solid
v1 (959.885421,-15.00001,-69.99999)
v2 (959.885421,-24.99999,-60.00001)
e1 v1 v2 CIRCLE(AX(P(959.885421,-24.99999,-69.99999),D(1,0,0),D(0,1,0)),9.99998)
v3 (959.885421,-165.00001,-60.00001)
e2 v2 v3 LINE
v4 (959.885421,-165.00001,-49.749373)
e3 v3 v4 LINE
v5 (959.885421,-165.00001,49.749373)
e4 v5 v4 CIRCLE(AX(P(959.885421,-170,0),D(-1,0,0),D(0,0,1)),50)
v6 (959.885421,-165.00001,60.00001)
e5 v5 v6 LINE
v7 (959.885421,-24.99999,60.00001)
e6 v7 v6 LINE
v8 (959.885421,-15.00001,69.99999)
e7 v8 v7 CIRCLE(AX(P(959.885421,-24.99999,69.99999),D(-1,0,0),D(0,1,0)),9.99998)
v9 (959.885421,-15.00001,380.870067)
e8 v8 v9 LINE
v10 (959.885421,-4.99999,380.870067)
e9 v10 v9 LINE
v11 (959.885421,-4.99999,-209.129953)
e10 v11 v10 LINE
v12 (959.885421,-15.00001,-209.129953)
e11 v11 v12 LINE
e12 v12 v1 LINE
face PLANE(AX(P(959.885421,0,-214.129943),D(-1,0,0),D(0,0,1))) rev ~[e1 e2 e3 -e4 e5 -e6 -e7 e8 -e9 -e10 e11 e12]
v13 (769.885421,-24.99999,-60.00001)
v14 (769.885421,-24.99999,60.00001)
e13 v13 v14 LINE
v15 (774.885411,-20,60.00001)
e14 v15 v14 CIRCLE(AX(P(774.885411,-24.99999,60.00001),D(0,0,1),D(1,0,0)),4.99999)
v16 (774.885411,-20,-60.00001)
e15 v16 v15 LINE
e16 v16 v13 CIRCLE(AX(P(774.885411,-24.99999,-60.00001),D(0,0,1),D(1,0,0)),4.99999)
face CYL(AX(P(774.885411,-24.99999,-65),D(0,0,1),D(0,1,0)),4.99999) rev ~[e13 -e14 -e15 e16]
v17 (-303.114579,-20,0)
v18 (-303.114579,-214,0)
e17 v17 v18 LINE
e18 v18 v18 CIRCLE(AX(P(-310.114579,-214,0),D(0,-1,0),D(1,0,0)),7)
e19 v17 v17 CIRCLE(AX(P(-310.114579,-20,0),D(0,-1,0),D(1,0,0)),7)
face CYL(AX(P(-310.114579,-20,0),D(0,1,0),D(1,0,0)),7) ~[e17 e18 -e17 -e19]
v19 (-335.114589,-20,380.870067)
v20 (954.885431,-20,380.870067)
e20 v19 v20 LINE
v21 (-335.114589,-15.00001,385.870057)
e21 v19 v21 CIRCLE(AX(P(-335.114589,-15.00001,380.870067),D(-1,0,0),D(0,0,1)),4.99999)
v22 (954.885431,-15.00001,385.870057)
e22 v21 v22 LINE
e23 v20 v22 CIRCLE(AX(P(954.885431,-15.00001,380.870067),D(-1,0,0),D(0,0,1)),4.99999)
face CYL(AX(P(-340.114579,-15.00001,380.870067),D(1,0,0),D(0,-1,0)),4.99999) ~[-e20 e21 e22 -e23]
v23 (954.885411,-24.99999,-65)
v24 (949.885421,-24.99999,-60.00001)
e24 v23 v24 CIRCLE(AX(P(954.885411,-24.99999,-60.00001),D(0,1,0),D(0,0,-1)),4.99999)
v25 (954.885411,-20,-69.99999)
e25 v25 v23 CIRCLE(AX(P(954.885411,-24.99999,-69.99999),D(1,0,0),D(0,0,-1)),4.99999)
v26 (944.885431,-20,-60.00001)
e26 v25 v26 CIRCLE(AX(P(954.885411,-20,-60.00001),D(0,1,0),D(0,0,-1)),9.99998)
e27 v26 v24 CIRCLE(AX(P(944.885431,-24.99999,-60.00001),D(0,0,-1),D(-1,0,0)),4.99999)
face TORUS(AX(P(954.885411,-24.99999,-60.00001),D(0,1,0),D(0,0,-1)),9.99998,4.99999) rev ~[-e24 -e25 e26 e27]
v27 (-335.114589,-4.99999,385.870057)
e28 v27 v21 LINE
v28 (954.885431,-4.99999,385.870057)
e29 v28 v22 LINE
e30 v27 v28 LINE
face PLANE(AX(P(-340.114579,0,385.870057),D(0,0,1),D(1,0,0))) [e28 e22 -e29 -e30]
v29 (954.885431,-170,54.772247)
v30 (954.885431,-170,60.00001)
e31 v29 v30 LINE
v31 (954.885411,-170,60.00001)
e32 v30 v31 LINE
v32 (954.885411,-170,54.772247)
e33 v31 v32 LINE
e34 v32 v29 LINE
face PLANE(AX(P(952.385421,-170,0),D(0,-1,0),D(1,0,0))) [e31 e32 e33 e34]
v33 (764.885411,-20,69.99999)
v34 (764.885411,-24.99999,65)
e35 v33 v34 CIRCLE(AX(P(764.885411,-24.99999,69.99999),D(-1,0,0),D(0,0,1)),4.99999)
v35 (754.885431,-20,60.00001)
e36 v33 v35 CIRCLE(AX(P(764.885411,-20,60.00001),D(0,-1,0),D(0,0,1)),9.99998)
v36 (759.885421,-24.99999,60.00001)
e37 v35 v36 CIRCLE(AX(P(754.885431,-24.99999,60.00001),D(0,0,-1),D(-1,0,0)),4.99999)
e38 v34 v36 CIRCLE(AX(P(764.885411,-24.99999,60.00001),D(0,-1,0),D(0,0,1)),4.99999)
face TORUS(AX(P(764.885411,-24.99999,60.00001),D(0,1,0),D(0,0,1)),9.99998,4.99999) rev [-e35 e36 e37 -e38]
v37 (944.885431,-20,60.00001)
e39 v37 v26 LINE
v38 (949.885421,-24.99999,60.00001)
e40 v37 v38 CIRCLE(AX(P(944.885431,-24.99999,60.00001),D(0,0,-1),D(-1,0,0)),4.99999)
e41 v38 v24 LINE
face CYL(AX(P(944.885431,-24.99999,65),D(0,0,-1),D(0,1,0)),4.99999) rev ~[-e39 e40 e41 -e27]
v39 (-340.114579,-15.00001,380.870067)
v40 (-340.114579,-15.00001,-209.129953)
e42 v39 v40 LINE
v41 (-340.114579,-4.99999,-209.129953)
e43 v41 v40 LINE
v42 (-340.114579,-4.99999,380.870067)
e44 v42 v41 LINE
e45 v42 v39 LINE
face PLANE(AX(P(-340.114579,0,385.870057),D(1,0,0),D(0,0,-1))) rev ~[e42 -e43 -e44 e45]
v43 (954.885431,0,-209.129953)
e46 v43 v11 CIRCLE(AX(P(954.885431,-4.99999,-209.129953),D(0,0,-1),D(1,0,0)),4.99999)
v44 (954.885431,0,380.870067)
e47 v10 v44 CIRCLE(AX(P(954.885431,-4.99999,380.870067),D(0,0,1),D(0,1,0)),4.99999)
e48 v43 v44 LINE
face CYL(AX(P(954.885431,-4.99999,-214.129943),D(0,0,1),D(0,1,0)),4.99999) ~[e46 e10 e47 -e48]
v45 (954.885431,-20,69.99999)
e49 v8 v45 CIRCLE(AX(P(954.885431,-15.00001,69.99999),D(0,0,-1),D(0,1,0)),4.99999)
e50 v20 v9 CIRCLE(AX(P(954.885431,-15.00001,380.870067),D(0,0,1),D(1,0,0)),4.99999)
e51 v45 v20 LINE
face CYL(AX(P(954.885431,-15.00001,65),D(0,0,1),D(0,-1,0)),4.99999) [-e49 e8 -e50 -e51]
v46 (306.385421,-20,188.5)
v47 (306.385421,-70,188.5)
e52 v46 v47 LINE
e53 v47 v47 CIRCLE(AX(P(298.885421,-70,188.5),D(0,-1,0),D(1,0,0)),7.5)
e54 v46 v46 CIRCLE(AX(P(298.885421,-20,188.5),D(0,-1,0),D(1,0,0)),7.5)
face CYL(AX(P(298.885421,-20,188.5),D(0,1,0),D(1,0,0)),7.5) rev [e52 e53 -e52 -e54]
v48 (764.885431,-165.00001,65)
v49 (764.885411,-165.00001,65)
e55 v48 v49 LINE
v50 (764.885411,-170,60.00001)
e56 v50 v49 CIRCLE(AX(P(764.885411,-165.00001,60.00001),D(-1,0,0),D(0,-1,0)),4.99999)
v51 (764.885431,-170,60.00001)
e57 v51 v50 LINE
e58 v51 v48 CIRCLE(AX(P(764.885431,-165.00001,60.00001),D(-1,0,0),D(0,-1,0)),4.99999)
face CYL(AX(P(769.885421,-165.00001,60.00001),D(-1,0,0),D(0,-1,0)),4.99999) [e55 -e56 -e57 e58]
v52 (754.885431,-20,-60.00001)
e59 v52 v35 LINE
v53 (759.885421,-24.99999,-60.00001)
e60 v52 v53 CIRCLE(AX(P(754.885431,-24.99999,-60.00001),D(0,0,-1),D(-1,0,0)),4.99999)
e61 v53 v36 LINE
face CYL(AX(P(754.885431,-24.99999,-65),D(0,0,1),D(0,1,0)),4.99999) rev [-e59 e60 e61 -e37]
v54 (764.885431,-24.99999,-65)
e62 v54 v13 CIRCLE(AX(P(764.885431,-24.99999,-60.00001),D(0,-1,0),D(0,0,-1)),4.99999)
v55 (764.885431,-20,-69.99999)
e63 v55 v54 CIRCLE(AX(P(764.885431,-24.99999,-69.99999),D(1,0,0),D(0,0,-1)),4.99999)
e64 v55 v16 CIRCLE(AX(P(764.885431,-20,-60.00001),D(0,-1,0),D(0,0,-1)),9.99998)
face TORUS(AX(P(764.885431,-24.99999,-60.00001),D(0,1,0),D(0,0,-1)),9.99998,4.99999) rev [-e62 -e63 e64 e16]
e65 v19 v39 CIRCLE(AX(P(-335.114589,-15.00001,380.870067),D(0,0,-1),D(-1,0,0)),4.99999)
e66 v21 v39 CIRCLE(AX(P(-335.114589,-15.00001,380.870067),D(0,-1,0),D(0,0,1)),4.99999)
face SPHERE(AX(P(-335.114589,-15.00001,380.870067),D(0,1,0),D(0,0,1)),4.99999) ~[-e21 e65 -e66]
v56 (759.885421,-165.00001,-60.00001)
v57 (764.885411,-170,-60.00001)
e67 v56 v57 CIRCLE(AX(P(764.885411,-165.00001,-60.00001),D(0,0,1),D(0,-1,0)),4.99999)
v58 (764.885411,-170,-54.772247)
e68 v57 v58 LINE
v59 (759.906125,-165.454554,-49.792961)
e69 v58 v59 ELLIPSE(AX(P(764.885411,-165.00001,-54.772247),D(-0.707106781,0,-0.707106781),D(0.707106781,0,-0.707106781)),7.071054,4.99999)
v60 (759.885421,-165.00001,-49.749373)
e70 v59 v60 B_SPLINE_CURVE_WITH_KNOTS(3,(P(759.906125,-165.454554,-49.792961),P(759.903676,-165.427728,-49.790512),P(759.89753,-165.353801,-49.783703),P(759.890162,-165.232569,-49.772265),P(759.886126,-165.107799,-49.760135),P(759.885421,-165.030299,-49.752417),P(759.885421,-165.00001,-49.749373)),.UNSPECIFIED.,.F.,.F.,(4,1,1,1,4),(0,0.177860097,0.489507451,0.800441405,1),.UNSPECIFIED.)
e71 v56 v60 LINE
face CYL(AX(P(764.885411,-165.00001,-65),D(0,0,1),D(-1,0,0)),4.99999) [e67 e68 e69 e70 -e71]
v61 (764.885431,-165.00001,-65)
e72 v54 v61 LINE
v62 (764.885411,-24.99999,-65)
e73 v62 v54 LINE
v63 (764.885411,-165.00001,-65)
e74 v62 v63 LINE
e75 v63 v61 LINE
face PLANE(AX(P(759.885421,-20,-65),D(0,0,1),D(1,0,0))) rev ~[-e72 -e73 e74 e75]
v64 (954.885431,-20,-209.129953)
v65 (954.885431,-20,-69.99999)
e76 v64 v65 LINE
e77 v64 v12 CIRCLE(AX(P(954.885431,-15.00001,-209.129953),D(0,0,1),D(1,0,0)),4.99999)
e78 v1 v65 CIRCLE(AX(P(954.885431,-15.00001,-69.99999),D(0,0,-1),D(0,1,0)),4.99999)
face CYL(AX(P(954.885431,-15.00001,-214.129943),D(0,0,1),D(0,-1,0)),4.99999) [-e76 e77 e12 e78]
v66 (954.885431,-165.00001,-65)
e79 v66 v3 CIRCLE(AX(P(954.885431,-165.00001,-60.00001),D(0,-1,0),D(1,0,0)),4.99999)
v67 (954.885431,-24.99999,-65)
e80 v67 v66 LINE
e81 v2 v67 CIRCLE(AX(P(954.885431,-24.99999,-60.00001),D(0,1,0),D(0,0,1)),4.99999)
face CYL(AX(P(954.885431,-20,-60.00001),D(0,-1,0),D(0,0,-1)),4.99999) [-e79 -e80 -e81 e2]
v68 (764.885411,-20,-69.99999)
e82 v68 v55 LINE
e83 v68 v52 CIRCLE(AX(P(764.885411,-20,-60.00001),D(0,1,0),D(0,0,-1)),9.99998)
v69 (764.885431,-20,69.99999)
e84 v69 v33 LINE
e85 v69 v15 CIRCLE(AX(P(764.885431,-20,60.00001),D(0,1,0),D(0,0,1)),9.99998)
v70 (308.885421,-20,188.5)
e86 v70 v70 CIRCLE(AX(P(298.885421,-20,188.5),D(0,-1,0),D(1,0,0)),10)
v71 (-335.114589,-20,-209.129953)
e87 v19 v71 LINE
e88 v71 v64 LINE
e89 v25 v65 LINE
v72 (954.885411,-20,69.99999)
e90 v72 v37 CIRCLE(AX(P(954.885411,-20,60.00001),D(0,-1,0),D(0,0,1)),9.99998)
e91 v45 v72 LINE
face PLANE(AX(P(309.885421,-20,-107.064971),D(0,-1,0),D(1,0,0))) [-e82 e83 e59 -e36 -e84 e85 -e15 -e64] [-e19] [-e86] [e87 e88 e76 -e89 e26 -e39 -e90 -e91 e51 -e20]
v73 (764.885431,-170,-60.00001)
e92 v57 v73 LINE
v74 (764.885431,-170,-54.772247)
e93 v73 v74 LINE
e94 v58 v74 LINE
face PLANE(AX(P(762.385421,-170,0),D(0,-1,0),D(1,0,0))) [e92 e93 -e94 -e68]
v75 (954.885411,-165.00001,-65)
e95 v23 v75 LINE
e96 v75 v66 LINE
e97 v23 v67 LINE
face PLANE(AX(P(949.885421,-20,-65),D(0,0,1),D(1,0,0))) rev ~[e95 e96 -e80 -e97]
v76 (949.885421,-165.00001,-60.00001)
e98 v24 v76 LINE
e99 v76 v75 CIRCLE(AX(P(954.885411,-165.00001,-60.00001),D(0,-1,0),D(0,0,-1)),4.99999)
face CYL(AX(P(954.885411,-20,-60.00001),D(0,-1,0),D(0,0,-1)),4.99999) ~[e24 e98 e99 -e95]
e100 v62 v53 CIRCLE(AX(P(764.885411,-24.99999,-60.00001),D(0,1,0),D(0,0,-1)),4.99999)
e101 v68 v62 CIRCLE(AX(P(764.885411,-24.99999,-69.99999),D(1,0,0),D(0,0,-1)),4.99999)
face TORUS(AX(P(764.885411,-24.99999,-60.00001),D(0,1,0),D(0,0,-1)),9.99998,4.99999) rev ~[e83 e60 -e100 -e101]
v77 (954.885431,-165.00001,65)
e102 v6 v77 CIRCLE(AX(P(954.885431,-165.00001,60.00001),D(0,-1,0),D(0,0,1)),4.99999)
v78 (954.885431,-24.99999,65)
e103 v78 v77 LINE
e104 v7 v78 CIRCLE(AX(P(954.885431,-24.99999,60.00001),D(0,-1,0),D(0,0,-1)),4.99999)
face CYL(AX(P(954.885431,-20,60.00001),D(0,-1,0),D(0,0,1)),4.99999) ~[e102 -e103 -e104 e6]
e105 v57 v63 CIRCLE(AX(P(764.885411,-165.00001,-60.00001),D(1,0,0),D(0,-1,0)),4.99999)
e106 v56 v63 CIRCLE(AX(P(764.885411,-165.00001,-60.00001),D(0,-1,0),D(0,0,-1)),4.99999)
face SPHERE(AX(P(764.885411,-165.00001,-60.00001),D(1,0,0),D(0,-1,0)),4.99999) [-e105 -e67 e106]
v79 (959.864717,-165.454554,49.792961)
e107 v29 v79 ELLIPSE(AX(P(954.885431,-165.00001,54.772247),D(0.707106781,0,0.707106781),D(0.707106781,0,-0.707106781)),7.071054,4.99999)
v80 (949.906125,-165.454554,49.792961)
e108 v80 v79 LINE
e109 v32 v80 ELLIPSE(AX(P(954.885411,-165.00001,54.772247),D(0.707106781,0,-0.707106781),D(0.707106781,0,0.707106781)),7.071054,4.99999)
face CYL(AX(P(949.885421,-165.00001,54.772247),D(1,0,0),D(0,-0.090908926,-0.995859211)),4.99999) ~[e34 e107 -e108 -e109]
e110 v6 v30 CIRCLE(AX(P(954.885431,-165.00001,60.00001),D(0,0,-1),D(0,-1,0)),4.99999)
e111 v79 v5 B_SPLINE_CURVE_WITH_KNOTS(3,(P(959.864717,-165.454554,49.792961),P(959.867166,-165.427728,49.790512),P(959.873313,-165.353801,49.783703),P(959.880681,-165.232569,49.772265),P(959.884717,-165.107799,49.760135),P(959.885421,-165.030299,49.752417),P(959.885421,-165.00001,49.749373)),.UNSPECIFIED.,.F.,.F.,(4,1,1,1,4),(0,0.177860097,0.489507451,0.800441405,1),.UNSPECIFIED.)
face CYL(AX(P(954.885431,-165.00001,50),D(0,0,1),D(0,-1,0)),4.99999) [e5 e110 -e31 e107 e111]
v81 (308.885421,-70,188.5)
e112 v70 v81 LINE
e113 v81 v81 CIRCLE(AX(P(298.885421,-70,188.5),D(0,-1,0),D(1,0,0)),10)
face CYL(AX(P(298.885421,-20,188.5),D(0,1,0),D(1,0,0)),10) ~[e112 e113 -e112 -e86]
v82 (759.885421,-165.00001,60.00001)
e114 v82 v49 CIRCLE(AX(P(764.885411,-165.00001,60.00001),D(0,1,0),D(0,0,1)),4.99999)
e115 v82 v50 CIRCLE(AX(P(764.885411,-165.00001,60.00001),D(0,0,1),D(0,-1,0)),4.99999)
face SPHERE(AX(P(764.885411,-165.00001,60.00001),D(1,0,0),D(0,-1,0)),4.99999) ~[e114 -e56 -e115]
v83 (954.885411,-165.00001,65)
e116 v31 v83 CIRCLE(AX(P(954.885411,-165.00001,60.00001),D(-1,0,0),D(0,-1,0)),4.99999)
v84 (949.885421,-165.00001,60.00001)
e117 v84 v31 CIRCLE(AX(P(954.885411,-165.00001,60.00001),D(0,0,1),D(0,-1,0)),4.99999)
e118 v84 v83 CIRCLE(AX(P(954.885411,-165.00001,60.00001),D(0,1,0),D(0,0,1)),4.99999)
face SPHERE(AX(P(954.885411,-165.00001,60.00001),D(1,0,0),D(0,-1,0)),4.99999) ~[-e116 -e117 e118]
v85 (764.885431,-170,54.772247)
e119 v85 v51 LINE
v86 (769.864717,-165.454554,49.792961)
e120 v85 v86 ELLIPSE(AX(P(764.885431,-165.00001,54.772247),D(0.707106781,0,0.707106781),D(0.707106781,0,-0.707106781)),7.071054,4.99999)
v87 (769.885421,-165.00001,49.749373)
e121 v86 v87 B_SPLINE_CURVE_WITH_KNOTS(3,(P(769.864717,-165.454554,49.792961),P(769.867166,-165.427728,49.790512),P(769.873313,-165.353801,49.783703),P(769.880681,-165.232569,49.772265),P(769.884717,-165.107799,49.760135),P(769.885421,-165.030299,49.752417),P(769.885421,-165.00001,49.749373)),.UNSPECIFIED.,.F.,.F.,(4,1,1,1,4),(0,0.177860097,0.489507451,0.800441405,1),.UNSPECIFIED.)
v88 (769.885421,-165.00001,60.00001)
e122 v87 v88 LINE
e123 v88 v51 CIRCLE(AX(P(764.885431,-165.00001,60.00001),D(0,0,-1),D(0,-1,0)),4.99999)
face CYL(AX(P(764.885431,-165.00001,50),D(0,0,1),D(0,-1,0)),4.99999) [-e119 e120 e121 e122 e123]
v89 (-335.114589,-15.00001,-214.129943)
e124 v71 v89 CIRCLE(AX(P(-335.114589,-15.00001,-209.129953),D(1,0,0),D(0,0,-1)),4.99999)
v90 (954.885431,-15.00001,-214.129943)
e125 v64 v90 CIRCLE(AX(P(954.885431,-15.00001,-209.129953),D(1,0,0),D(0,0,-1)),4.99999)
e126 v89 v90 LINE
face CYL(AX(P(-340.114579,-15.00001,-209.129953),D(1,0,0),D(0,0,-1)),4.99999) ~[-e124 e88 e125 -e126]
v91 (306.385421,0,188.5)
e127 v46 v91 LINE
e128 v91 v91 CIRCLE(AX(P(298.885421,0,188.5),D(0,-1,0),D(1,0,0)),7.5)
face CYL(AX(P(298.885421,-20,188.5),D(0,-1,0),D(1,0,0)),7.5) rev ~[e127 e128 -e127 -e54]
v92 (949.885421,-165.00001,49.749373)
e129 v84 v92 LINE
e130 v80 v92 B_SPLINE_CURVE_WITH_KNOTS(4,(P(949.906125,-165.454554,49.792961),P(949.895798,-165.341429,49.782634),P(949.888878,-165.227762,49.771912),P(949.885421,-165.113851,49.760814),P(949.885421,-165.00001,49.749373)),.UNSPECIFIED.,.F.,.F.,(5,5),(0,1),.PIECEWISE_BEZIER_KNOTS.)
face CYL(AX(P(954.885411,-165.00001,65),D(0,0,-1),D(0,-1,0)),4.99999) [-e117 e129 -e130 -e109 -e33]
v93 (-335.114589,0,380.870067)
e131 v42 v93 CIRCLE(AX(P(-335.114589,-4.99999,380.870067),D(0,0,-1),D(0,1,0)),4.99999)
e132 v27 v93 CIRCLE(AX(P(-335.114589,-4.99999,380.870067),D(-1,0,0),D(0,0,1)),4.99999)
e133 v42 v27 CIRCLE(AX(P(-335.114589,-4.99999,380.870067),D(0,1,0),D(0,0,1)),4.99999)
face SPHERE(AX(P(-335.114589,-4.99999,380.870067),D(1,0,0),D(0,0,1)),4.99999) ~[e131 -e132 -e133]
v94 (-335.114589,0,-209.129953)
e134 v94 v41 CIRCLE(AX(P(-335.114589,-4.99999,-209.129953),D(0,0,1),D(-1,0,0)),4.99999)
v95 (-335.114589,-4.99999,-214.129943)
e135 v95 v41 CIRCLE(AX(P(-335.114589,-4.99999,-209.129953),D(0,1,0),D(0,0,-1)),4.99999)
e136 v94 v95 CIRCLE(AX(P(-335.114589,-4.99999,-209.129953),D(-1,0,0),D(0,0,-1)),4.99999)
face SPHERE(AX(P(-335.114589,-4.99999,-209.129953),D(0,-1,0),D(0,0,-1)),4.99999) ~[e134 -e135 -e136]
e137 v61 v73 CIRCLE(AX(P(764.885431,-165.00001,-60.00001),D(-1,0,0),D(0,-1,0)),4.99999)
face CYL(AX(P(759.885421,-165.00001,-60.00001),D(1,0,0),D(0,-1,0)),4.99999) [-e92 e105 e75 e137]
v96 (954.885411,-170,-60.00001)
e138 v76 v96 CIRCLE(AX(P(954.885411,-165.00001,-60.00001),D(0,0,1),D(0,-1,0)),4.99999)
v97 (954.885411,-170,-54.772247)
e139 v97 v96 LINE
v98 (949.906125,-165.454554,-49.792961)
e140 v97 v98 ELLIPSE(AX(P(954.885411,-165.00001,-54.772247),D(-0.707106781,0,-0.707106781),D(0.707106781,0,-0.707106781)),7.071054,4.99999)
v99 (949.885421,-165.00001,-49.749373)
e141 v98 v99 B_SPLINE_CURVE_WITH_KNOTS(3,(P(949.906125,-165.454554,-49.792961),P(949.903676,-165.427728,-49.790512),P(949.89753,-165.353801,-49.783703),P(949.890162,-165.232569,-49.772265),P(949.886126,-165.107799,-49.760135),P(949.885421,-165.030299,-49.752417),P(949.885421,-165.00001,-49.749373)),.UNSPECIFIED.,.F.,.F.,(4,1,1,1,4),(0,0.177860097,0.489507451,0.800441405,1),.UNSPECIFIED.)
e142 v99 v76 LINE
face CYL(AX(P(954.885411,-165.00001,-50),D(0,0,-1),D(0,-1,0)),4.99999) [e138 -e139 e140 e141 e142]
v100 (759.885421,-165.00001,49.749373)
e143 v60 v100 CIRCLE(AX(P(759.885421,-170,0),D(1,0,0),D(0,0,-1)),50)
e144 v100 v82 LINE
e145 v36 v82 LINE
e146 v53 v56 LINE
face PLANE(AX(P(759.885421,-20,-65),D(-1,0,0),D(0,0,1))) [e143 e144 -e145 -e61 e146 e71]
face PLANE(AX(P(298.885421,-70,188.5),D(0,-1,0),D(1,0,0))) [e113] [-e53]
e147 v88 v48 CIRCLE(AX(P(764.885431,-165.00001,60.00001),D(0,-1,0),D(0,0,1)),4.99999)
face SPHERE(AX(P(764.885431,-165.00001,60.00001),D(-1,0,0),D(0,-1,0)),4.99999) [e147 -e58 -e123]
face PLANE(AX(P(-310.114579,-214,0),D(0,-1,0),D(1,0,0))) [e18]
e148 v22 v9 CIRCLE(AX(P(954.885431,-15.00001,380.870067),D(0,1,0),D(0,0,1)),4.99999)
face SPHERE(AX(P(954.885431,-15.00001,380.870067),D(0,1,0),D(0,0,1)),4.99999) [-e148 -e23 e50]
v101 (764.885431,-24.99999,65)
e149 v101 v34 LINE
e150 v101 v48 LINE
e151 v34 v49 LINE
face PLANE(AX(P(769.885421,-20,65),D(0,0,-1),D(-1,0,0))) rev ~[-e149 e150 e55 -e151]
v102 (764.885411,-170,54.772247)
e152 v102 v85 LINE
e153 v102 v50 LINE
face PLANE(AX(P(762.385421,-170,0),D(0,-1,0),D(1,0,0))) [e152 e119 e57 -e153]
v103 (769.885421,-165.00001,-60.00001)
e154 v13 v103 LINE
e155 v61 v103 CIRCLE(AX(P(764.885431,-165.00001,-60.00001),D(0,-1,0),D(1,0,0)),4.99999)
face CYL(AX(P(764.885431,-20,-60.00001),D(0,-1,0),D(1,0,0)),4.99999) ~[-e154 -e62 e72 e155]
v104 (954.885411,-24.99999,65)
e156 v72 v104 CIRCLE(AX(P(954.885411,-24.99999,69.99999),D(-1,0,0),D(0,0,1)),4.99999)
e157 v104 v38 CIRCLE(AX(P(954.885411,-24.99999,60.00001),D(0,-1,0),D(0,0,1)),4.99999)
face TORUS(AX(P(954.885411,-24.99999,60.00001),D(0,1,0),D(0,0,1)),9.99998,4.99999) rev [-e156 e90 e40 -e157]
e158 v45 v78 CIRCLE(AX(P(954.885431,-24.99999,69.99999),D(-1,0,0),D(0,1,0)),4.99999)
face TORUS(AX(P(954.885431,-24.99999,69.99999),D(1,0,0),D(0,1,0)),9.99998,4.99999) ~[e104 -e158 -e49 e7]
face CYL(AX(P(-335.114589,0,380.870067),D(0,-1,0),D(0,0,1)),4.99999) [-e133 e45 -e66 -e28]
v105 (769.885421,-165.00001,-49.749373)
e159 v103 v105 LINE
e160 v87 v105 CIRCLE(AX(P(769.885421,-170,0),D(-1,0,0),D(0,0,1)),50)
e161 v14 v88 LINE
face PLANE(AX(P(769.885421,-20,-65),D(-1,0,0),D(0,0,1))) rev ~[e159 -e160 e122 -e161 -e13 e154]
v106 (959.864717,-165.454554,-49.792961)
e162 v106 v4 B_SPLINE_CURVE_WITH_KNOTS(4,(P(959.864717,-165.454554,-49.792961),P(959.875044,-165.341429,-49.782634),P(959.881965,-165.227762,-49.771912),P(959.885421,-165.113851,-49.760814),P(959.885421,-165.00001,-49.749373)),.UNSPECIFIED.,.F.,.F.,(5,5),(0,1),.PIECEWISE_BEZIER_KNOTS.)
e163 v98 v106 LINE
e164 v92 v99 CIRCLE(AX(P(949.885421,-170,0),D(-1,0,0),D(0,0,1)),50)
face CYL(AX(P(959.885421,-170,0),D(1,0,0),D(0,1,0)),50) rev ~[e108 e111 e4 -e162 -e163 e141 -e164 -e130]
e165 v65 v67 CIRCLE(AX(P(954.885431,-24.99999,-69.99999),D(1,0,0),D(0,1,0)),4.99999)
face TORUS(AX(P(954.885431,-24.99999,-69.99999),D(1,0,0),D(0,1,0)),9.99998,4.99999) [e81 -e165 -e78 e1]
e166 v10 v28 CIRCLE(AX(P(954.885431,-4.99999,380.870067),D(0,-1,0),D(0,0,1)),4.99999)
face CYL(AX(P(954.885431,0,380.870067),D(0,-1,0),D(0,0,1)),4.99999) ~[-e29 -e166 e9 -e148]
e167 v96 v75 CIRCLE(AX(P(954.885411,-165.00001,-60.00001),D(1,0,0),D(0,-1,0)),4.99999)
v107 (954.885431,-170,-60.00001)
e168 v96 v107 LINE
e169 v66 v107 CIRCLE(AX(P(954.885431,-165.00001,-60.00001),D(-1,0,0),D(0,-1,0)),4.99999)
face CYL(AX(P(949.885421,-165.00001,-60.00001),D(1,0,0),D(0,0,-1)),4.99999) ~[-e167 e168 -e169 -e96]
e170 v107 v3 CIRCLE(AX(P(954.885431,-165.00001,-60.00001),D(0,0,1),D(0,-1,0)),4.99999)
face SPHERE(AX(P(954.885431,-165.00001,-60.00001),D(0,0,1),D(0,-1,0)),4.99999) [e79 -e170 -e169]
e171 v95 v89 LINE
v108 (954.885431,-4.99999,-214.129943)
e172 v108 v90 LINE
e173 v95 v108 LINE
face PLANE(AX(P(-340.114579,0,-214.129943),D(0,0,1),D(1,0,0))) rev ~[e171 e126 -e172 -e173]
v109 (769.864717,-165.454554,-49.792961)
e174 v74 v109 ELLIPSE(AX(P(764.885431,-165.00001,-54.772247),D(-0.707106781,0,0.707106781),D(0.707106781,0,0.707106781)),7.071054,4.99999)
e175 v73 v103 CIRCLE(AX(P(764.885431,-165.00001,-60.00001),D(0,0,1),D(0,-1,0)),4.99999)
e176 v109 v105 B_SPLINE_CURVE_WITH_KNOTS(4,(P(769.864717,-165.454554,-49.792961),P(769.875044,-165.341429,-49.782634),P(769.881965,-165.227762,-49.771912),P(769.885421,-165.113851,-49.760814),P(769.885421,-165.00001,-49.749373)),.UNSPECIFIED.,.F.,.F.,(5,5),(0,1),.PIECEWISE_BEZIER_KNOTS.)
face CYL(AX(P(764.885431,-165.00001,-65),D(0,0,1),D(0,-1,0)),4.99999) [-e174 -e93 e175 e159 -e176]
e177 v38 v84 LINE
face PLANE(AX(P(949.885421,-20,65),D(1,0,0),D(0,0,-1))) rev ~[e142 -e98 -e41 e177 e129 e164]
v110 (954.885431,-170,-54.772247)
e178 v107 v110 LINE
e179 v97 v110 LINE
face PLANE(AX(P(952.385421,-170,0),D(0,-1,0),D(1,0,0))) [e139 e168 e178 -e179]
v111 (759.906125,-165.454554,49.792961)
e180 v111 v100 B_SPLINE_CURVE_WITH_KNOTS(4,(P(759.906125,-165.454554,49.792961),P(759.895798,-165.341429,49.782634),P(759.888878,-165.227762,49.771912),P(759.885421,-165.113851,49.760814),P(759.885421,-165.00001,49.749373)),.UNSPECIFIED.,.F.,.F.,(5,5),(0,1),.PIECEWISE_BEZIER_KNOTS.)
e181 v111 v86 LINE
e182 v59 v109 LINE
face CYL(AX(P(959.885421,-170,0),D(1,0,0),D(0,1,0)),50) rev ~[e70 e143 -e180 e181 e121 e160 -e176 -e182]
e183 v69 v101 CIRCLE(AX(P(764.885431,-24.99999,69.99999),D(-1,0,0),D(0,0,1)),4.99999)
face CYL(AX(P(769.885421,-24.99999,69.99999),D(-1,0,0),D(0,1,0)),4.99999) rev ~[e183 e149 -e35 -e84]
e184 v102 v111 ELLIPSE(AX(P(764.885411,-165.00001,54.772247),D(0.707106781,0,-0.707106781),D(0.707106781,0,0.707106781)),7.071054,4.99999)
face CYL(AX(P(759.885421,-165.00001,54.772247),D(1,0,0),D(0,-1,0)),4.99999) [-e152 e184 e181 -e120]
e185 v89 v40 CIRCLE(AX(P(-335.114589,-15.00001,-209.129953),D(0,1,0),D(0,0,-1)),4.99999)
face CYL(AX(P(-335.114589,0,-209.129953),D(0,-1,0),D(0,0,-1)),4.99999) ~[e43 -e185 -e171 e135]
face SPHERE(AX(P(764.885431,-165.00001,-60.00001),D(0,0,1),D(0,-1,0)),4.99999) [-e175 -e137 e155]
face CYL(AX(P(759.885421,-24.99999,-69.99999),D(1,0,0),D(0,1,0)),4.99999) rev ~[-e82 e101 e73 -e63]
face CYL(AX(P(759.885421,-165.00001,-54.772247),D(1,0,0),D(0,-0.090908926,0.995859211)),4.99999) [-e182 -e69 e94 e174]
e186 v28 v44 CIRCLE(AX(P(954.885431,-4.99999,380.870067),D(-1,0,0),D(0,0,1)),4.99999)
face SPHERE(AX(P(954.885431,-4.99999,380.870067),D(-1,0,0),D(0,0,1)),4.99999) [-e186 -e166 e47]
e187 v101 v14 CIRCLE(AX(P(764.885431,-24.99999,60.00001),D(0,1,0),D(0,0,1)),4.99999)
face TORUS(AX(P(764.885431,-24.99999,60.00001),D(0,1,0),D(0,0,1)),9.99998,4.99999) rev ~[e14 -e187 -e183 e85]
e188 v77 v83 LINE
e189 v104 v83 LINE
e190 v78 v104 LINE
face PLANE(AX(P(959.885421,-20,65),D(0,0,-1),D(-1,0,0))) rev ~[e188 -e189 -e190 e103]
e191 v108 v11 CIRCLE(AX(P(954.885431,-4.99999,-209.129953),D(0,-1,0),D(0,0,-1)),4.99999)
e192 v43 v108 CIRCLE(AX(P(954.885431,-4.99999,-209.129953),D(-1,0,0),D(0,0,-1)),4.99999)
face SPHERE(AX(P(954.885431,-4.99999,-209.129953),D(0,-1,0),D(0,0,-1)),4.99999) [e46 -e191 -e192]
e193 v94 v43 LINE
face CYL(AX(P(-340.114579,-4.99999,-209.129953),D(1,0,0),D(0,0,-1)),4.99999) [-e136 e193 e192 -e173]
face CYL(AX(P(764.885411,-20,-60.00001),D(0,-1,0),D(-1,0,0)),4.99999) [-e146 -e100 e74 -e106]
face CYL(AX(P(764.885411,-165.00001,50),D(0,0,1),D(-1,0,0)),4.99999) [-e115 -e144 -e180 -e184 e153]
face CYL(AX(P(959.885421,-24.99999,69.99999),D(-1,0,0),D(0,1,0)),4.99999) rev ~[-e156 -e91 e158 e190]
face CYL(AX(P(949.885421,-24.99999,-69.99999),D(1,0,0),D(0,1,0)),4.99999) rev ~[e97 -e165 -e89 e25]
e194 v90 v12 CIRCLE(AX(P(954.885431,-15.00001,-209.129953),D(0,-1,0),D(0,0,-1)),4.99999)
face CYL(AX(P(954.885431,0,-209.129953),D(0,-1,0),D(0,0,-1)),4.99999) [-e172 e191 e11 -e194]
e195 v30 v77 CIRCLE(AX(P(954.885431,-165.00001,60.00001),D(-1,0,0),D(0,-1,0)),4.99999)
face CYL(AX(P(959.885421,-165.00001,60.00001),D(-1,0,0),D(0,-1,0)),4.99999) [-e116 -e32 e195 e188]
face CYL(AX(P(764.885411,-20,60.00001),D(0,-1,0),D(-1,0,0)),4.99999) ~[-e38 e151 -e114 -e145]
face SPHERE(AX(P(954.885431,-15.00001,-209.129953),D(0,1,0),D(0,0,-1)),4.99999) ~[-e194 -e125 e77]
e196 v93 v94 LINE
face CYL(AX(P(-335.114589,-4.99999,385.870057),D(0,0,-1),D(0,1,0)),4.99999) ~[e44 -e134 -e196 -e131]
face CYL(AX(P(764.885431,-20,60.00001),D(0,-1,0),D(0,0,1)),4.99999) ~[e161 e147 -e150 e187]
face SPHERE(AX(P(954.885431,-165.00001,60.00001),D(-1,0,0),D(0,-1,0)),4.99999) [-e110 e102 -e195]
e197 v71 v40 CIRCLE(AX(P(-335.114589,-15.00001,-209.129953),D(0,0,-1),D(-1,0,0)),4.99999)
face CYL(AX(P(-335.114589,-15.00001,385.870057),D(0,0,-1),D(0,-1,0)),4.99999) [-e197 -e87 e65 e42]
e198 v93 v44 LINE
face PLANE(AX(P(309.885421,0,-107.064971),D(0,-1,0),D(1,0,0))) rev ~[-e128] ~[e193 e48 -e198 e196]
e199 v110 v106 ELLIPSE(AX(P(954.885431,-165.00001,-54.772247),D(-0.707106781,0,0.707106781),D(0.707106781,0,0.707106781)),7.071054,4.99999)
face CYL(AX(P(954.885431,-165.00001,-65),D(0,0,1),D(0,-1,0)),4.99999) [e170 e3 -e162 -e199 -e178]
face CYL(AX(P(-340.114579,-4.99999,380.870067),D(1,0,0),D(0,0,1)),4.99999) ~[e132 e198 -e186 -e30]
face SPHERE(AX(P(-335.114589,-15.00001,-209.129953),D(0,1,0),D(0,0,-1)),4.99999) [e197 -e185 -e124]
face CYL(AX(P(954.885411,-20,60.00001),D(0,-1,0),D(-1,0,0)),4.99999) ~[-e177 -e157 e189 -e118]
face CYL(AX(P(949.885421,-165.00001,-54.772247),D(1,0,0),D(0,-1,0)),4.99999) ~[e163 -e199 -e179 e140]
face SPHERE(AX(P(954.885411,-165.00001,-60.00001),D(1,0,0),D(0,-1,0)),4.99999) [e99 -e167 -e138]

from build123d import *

# Parameters (mm, degrees)
F0_W      = 1300
F0_H      = 214.1299426556
F0_H_2    = 385.8700573444
F1_DEPTH  = 20
F2_W      = 5
F2_H      = 130
F3_DEPTH  = 150
F4_R      = 50
F5_DEPTH  = 2015
F6_R      = 4.99999
F7_R      = 7.5
F8_DEPTH  = 20.001
F7_R_2    = 10
F9_DEPTH  = 50
F10_R     = 7
F11_DEPTH = 194


# Not quite as in the source:
# - a fillet or chamfer is up to 0.001 mm smaller than in the source, because OpenCascade refuses the exact size


with BuildPart() as f1:
    # F0 (on Front) → F1 (new body)
    with BuildSketch(Plane.XZ):
        with Locations((309.8854213953, -107.0649713278)):
            Rectangle(F0_W, F0_H)
        with Locations((309.8854213953, 192.9350286722)):
            Rectangle(F0_W, F0_H_2)
    extrude(amount=F1_DEPTH)

    # F2 (on face) → F3 (join)
    with BuildSketch(Plane.XZ.offset(20)):
        Polygon((949.8854213953, 65), (949.8854213953, 0), (949.8854213953, -65), (954.8854213953, -65), (954.8854213953, 65), align=None)
        with Locations((762.3854213953, 0)):
            Rectangle(F2_W, F2_H)
        Polygon((769.8854213953, 65), (764.8854213953, 65), (764.8854213953, -65), (769.8854213953, -65), (769.8854213953, 0), align=None)
        with Locations((957.3854213953, 0)):
            Rectangle(F2_W, F2_H)
    extrude(amount=F3_DEPTH)

    # F4 (on face) → F5 (cut)
    with BuildSketch(Plane.YZ.offset(959.8854213953)):
        with Locations((-170, 0)):
            Circle(F4_R)
    extrude(amount=-F5_DEPTH, mode=Mode.SUBTRACT)

    # F6 (radius 5 in the source; OpenCascade refuses exactly that, so slightly less here)
    f6_edges = [f1.edges().sort_by_distance(p)[0] for p in [
        (764.885421, -170, -50),
        (769.885421, -170, -57.5),
        (764.885421, -170, -65),
        (759.885421, -170, -57.5),
        (764.885421, -170, 65),
        (769.885421, -170, 57.5),
        (764.885421, -170, 50),
        (759.885421, -170, 57.5),
        (759.885421, -95, -65),
        (769.885421, -95, -65),
        (764.885421, -20, -65),
        (769.885421, -95, 65),
        (759.885421, -95, 65),
        (764.885421, -20, 65),
        (954.885421, -170, 65),
        (959.885421, -170, 57.5),
        (954.885421, -170, 50),
        (949.885421, -170, 57.5),
        (954.885421, -170, -50),
        (959.885421, -170, -57.5),
        (954.885421, -170, -65),
        (949.885421, -170, -57.5),
        (949.885421, -95, -65),
        (959.885421, -95, -65),
        (954.885421, -20, -65),
        (959.885421, -95, 65),
        (949.885421, -95, 65),
        (954.885421, -20, 65),
        (309.885421, 0, 385.870057),
        (959.885421, -10, 385.870057),
        (-340.114579, -10, 385.870057),
        (309.885421, -20, 385.870057),
        (-340.114579, -10, -214.129943),
        (959.885421, -10, -214.129943),
        (309.885421, 0, -214.129943),
        (309.885421, -20, -214.129943),
        (959.885421, 0, 85.870057),
        (-340.114579, 0, 85.870057),
        (-340.114579, -20, 85.870057),
        (959.885421, -20, 225.435029),
        (949.885421, -20, 0),
        (959.885421, -20, -139.564971),
        (759.885421, -20, 0),
        (769.885421, -20, 0),
    ]]
    fillet(f6_edges, radius=F6_R)

    # F7 (on face) → F8 (cut, through all)
    with BuildSketch(Plane.XZ.offset(20)):
        with Locations((298.8854213953, 188.5)):
            Circle(F7_R)
    extrude(amount=-F8_DEPTH, mode=Mode.SUBTRACT)

    # F7 (on face) → F9 (join)
    with BuildSketch(Plane.XZ.offset(20)):
        with Locations((298.8854213953, 188.5)):
            Circle(F7_R_2)
        with Locations((298.8854213953, 188.5)):
            Circle(F7_R, mode=Mode.SUBTRACT)
    extrude(amount=F9_DEPTH)

    # F10 (on face) → F11 (join)
    with BuildSketch(Plane.XZ.offset(20)):
        with Locations((-310.1145786047, 0)):
            Circle(F10_R)
    extrude(amount=F11_DEPTH)


solid = f1.part
